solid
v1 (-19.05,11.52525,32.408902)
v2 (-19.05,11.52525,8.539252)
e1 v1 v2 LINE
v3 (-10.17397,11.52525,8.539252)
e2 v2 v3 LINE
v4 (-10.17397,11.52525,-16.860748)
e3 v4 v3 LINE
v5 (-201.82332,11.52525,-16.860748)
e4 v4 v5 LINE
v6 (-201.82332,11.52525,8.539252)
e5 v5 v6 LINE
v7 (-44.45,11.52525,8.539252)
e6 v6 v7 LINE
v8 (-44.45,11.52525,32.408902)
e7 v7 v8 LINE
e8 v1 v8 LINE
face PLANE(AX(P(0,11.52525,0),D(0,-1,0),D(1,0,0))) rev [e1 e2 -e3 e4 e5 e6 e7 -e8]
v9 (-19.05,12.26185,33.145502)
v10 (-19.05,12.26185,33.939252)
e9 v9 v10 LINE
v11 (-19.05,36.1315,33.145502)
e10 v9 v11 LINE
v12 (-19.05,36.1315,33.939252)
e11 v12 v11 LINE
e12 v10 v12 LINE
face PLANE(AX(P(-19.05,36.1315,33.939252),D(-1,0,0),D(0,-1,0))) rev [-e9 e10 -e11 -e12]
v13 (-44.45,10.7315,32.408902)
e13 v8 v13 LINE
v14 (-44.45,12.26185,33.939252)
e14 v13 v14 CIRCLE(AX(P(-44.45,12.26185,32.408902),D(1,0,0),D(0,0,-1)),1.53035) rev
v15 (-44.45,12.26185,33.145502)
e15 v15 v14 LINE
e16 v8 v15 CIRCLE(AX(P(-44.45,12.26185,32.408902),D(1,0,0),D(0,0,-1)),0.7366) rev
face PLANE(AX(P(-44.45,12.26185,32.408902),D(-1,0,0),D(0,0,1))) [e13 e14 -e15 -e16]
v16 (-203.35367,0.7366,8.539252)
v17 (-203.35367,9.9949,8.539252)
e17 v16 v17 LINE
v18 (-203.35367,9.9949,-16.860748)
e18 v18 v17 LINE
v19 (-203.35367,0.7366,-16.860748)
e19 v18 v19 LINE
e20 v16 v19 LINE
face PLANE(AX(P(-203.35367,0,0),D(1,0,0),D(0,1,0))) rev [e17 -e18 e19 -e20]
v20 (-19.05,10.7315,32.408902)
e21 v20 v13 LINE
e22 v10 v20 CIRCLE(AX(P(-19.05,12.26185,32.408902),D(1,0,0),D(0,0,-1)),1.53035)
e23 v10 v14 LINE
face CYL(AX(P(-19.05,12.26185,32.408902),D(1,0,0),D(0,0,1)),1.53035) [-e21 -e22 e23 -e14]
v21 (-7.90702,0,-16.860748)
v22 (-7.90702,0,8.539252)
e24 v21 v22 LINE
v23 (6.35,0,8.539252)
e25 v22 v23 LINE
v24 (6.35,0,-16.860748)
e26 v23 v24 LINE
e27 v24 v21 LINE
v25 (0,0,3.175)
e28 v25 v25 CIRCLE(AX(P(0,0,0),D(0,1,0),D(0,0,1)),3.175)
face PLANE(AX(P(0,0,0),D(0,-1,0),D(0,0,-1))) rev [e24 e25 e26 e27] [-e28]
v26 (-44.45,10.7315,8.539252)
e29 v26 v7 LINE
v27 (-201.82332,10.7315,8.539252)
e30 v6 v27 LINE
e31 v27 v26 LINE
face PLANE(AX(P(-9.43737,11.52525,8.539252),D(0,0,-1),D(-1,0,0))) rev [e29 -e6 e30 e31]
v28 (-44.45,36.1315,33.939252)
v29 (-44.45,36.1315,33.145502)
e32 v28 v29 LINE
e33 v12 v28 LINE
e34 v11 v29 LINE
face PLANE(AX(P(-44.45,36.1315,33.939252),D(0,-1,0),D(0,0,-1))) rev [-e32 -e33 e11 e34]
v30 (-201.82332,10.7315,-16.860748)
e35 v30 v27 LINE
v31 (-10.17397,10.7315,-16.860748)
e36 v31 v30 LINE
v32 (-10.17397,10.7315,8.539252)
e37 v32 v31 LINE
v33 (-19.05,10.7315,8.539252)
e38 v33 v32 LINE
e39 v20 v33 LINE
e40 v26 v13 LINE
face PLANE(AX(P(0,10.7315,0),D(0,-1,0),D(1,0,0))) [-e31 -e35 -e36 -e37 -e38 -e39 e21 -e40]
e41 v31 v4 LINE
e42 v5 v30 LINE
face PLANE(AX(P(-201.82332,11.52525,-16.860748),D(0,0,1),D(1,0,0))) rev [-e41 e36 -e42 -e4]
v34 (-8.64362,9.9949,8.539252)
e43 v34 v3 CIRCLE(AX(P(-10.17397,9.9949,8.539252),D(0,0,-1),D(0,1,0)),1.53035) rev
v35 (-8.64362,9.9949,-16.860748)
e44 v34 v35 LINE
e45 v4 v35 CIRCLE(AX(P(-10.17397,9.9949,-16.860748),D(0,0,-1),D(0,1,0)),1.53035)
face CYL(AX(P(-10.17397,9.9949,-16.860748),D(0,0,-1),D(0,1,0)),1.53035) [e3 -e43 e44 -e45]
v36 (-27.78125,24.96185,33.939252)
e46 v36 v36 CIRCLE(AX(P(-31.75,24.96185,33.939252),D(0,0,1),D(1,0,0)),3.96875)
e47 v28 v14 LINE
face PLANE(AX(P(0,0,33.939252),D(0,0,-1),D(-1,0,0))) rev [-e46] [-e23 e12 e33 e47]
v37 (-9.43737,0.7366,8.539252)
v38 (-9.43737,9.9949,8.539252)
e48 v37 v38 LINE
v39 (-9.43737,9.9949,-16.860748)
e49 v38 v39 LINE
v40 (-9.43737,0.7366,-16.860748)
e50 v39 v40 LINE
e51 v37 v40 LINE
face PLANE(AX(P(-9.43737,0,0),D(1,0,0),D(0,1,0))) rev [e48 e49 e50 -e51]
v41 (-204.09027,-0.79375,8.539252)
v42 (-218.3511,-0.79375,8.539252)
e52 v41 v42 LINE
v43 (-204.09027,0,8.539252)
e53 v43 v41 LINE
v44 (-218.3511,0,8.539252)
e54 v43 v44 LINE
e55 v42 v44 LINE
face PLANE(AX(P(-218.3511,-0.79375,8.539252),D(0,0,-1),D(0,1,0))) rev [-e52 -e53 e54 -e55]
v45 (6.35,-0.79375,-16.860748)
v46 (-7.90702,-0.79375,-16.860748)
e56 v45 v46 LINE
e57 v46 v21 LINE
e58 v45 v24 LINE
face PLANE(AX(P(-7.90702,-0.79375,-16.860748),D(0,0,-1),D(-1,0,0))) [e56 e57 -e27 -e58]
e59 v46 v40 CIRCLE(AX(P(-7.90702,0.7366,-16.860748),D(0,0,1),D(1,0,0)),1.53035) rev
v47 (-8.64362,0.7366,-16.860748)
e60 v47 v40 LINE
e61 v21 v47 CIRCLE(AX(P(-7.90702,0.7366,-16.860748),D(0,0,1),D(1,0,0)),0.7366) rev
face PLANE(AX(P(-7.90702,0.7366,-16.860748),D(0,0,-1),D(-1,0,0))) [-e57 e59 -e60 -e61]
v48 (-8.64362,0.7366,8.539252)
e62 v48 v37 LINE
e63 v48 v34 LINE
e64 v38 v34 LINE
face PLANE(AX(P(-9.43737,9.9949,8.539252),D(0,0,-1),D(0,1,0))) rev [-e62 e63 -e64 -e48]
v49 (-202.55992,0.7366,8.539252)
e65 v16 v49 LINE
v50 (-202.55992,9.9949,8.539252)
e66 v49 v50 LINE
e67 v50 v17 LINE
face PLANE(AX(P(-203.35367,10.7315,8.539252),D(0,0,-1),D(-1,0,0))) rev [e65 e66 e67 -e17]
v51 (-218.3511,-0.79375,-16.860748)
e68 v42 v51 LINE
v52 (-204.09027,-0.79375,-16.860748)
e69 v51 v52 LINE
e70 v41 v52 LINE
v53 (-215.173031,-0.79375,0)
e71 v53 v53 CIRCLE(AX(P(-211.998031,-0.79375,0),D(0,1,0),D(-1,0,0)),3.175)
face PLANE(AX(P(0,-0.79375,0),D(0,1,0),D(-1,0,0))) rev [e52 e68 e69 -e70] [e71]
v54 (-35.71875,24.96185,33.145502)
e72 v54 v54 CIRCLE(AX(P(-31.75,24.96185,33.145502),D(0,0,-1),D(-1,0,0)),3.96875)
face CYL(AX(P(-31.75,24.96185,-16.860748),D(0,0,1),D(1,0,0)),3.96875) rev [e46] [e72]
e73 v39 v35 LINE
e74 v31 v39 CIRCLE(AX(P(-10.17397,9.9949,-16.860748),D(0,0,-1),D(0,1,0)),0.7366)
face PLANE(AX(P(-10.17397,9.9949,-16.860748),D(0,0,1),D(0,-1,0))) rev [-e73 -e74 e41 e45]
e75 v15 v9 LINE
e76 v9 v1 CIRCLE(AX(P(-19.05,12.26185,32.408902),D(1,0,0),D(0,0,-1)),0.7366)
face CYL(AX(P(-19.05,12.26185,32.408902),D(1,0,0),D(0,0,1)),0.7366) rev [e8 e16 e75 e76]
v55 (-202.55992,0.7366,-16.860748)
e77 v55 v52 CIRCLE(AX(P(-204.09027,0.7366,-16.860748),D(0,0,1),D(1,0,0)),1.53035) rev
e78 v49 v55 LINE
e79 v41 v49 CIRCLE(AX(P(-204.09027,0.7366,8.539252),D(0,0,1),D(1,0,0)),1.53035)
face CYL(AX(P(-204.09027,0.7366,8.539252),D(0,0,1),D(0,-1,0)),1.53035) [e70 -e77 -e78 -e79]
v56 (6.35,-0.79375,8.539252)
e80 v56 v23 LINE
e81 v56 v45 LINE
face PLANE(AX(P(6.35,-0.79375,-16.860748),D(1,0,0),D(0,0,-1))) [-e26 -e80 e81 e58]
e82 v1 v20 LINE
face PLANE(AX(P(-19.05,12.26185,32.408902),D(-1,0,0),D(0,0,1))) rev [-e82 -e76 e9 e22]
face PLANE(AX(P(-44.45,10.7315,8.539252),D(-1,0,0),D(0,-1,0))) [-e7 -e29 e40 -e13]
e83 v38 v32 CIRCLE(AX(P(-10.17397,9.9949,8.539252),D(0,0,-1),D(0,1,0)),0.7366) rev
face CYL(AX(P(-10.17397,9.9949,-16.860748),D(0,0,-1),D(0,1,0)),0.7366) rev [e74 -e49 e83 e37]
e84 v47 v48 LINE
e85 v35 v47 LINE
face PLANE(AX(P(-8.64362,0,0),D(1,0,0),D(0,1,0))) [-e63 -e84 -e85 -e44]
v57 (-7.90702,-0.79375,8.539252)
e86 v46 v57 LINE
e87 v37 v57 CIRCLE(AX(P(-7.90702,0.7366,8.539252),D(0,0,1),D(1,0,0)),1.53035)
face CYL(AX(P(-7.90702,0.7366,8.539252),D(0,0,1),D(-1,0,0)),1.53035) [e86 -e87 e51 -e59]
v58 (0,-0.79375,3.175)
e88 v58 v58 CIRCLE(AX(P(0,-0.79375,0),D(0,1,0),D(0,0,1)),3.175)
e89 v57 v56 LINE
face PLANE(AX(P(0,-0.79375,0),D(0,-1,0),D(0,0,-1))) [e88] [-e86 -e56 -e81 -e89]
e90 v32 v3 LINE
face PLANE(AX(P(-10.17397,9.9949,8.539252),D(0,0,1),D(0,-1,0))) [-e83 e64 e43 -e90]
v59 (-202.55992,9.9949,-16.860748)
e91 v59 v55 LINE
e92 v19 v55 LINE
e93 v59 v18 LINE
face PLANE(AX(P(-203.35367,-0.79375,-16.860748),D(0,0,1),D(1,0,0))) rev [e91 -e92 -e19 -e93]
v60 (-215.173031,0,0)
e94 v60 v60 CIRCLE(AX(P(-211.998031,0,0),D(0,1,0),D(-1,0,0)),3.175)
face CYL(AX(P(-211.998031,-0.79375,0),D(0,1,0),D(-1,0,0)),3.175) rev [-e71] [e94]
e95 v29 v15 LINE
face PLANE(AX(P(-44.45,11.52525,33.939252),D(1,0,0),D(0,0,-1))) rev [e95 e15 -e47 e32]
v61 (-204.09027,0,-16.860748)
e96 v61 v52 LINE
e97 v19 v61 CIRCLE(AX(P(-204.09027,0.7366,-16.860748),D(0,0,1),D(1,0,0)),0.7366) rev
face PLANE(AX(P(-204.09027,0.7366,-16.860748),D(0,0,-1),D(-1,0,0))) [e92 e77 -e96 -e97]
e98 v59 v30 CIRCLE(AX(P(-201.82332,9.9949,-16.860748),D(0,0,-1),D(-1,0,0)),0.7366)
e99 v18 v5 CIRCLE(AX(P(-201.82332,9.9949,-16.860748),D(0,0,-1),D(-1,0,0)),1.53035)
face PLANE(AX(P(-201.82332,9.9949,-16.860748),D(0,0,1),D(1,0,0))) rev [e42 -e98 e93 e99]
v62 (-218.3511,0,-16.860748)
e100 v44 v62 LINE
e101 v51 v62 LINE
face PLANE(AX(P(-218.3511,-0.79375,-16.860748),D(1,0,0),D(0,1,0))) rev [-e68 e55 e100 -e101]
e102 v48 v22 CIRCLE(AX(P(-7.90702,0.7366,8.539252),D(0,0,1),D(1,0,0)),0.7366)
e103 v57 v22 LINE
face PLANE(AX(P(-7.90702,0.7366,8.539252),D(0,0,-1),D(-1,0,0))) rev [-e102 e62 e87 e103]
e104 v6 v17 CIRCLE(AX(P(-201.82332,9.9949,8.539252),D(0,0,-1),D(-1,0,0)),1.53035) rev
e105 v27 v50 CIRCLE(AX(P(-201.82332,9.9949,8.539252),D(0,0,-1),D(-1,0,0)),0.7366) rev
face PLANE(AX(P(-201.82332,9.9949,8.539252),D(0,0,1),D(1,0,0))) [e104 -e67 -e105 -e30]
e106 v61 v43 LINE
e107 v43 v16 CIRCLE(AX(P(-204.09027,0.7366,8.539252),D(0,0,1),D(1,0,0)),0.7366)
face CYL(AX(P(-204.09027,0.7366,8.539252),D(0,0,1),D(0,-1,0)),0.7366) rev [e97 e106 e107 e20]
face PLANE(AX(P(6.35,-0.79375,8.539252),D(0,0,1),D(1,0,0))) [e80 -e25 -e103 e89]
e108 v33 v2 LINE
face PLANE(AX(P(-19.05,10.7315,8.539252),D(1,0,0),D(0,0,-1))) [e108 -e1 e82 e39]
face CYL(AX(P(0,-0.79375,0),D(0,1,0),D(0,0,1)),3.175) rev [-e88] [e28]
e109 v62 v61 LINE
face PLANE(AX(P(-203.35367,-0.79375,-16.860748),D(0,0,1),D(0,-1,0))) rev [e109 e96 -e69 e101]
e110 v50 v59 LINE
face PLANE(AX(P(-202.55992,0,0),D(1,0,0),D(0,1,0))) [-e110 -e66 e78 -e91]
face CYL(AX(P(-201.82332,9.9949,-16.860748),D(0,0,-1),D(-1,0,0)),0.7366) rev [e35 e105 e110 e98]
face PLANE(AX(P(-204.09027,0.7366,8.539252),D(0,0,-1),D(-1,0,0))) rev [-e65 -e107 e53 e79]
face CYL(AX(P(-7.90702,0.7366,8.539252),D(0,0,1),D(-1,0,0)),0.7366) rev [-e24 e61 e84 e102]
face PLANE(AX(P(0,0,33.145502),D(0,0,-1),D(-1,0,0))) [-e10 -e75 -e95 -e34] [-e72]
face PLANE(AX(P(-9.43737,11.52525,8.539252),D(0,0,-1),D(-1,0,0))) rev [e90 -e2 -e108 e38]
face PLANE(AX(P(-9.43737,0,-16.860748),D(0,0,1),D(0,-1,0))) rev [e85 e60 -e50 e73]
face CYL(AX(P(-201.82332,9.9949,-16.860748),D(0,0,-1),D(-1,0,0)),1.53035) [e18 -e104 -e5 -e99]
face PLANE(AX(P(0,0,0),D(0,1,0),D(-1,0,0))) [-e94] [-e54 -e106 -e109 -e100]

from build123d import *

# Parameters (mm, degrees)
SKETCH1_W                    = 14.25702
SKETCH1_H                    = 25.4
SKETCH1_R                    = 3.175
BASE_FLANGE1_DEPTH           = 0.79375
EDGE_FLANGE1_DEPTH           = 25.4
EDGE_FLANGE2_DEPTH           = 25.4
EDGE_FLANGE3_DEPTH           = 25.4
EDGE_FLANGE4_STRIP_W         = 4.6482
EDGE_FLANGE4_STRIP_H         = 0.79375
EDGE_FLANGE4_STRIP_CUT_DEPTH = 25.4
EDGE_FLANGE4_DEPTH           = 25.4
SKETCH16_R                   = 3.175
CUT_EXTRUDE1_DEPTH           = 220.30417026
SKETCH19_W                   = 25.4
SKETCH19_H                   = 25.4
TAB1_DEPTH                   = 0.79375
EDGE_FLANGE5_STRIP_W         = 4.6482
EDGE_FLANGE5_STRIP_H         = 0.79375
EDGE_FLANGE5_STRIP_CUT_DEPTH = 25.4
EDGE_FLANGE5_DEPTH           = 25.4
SKETCH25_R                   = 3.96875
CUT_EXTRUDE2_DEPTH           = 228.075600106


# Sheet-metal steps are written as plain solids
with BuildPart() as part:
    # Sketch1 → Base-Flange1 (new body)
    with BuildSketch(Plane(origin=(0, 0, 0), x_dir=(1, 0, 0), z_dir=(0, 1, 0))):
        with Locations((-0.77851, 4.160748346)):
            Rectangle(SKETCH1_W, SKETCH1_H)
        with Locations(Location((0, 0, 0), (0, 0, 270))):
            Circle(SKETCH1_R, mode=Mode.SUBTRACT)
    extrude(amount=-BASE_FLANGE1_DEPTH)

    # Edge-Flange1 section (across the edge) → Edge-Flange1 (add)
    with BuildSketch(Plane(origin=(-8.64362, 0, -16.860748346), x_dir=(1, 0, 0), z_dir=(0, 0, 1))):
        with BuildLine():
            Line((-0.79375, 0.7366), (-0.79375, 9.9949))
            Line((-0.79375, 9.9949), (0, 9.9949))
            Line((0, 9.9949), (0, 0.7366))
            ThreePointArc((0, 0.7366), (0.215745145, 0.215745145), (0.7366, 0))
            Line((0.7366, 0), (0.7366, -0.79375))
            ThreePointArc((0.7366, -0.79375), (-0.345520863, -0.345520863), (-0.79375, 0.7366))
        make_face()
    extrude(amount=EDGE_FLANGE1_DEPTH)

    # Edge-Flange2 section (across the edge) → Edge-Flange2 (add)
    with BuildSketch(Plane(origin=(-9.43737, 10.7315, 8.539251654), x_dir=(0, -1, 0), z_dir=(0, 0, -1))):
        with BuildLine():
            Line((-0.79375, 0.7366), (-0.79375, 192.38595))
            Line((-0.79375, 192.38595), (0, 192.38595))
            Line((0, 192.38595), (0, 0.7366))
            ThreePointArc((0, 0.7366), (0.215745145, 0.215745145), (0.7366, 0))
            Line((0.7366, 0), (0.7366, -0.79375))
            ThreePointArc((0.7366, -0.79375), (-0.345520863, -0.345520863), (-0.79375, 0.7366))
        make_face()
    extrude(amount=EDGE_FLANGE2_DEPTH)

    # Edge-Flange3 section (across the edge) → Edge-Flange3 (add)
    with BuildSketch(Plane(origin=(-202.55992, 10.7315, 8.539251654), x_dir=(1, 0, 0), z_dir=(0, 0, -1))):
        with BuildLine():
            Line((-0.79375, 0.7366), (-0.79375, 11.52525))
            Line((-0.79375, 11.52525), (0, 11.52525))
            Line((0, 11.52525), (0, 0.7366))
            ThreePointArc((0, 0.7366), (0.215745145, 0.215745145), (0.7366, 0))
            Line((0.7366, 0), (0.7366, -0.79375))
            ThreePointArc((0.7366, -0.79375), (-0.345520863, -0.345520863), (-0.79375, 0.7366))
        make_face()
    extrude(amount=EDGE_FLANGE3_DEPTH)

    # Edge-Flange4 strip (across the edge) → Edge-Flange4 strip cut (cut)
    with BuildSketch(Plane(origin=(-203.35367, -0.79375, -16.860748346), x_dir=(0, 1, 0), z_dir=(0, 0, 1))):
        with Locations((-0.79375, -0.396875)):
            Rectangle(EDGE_FLANGE4_STRIP_W, EDGE_FLANGE4_STRIP_H)
    extrude(amount=EDGE_FLANGE4_STRIP_CUT_DEPTH, mode=Mode.SUBTRACT)

    # Edge-Flange4 section (across the edge) → Edge-Flange4 (add)
    with BuildSketch(Plane(origin=(-203.35367, -0.79375, -16.860748346), x_dir=(0, 1, 0), z_dir=(0, 0, 1))):
        with BuildLine():
            Line((0, 0.7366), (0, 14.99743))
            Line((0, 14.99743), (0.79375, 14.99743))
            Line((0.79375, 14.99743), (0.79375, 0.7366))
            ThreePointArc((0.79375, 0.7366), (1.009495145, 0.215745145), (1.53035, 0))
            Line((1.53035, 0), (1.53035, -0.79375))
            ThreePointArc((1.53035, -0.79375), (0.448229137, -0.345520863), (0, 0.7366))
        make_face()
    extrude(amount=EDGE_FLANGE4_DEPTH)

    # Sketch16 → Cut-Extrude1 (cut, through all)
    with BuildSketch(Plane(origin=(0, 0, 0), x_dir=(1, 0, 0), z_dir=(0, 1, 0))):
        with Locations(Location((-211.998031426, 0, 0), (0, 0, 180))):
            Circle(SKETCH16_R)
    extrude(amount=-CUT_EXTRUDE1_DEPTH, mode=Mode.SUBTRACT)

    # Sketch19 → Tab1 (add)
    with BuildSketch(Plane(origin=(0, 11.52525, 0), x_dir=(1, 0, 0), z_dir=(0, 1, 0))):
        with Locations((-31.75, -21.239251654)):
            Rectangle(SKETCH19_W, SKETCH19_H)
    extrude(amount=-TAB1_DEPTH)

    # Edge-Flange5 strip (across the edge) → Edge-Flange5 strip cut (cut)
    with BuildSketch(Plane(origin=(-44.45, 11.52525, 33.939251654), x_dir=(0, 0, -1), z_dir=(1, 0, 0))):
        with Locations((-0.79375, -0.396875)):
            Rectangle(EDGE_FLANGE5_STRIP_W, EDGE_FLANGE5_STRIP_H)
    extrude(amount=EDGE_FLANGE5_STRIP_CUT_DEPTH, mode=Mode.SUBTRACT)

    # Edge-Flange5 section (across the edge) → Edge-Flange5 (add)
    with BuildSketch(Plane(origin=(-44.45, 11.52525, 33.939251654), x_dir=(0, 0, -1), z_dir=(1, 0, 0))):
        with BuildLine():
            Line((0, 0.7366), (0, 24.60625))
            Line((0, 24.60625), (0.79375, 24.60625))
            Line((0.79375, 24.60625), (0.79375, 0.7366))
            ThreePointArc((0.79375, 0.7366), (1.009495145, 0.215745145), (1.53035, 0))
            Line((1.53035, 0), (1.53035, -0.79375))
            ThreePointArc((1.53035, -0.79375), (0.448229137, -0.345520863), (0, 0.7366))
        make_face()
    extrude(amount=EDGE_FLANGE5_DEPTH)

    # Sketch25 → Cut-Extrude2 (cut, through all)
    with BuildSketch(Plane.XY.offset(33.939251654)):
        with Locations((-31.75, 24.96185)):
            Circle(SKETCH25_R)
    extrude(amount=-CUT_EXTRUDE2_DEPTH, mode=Mode.SUBTRACT)


solid = part.part
